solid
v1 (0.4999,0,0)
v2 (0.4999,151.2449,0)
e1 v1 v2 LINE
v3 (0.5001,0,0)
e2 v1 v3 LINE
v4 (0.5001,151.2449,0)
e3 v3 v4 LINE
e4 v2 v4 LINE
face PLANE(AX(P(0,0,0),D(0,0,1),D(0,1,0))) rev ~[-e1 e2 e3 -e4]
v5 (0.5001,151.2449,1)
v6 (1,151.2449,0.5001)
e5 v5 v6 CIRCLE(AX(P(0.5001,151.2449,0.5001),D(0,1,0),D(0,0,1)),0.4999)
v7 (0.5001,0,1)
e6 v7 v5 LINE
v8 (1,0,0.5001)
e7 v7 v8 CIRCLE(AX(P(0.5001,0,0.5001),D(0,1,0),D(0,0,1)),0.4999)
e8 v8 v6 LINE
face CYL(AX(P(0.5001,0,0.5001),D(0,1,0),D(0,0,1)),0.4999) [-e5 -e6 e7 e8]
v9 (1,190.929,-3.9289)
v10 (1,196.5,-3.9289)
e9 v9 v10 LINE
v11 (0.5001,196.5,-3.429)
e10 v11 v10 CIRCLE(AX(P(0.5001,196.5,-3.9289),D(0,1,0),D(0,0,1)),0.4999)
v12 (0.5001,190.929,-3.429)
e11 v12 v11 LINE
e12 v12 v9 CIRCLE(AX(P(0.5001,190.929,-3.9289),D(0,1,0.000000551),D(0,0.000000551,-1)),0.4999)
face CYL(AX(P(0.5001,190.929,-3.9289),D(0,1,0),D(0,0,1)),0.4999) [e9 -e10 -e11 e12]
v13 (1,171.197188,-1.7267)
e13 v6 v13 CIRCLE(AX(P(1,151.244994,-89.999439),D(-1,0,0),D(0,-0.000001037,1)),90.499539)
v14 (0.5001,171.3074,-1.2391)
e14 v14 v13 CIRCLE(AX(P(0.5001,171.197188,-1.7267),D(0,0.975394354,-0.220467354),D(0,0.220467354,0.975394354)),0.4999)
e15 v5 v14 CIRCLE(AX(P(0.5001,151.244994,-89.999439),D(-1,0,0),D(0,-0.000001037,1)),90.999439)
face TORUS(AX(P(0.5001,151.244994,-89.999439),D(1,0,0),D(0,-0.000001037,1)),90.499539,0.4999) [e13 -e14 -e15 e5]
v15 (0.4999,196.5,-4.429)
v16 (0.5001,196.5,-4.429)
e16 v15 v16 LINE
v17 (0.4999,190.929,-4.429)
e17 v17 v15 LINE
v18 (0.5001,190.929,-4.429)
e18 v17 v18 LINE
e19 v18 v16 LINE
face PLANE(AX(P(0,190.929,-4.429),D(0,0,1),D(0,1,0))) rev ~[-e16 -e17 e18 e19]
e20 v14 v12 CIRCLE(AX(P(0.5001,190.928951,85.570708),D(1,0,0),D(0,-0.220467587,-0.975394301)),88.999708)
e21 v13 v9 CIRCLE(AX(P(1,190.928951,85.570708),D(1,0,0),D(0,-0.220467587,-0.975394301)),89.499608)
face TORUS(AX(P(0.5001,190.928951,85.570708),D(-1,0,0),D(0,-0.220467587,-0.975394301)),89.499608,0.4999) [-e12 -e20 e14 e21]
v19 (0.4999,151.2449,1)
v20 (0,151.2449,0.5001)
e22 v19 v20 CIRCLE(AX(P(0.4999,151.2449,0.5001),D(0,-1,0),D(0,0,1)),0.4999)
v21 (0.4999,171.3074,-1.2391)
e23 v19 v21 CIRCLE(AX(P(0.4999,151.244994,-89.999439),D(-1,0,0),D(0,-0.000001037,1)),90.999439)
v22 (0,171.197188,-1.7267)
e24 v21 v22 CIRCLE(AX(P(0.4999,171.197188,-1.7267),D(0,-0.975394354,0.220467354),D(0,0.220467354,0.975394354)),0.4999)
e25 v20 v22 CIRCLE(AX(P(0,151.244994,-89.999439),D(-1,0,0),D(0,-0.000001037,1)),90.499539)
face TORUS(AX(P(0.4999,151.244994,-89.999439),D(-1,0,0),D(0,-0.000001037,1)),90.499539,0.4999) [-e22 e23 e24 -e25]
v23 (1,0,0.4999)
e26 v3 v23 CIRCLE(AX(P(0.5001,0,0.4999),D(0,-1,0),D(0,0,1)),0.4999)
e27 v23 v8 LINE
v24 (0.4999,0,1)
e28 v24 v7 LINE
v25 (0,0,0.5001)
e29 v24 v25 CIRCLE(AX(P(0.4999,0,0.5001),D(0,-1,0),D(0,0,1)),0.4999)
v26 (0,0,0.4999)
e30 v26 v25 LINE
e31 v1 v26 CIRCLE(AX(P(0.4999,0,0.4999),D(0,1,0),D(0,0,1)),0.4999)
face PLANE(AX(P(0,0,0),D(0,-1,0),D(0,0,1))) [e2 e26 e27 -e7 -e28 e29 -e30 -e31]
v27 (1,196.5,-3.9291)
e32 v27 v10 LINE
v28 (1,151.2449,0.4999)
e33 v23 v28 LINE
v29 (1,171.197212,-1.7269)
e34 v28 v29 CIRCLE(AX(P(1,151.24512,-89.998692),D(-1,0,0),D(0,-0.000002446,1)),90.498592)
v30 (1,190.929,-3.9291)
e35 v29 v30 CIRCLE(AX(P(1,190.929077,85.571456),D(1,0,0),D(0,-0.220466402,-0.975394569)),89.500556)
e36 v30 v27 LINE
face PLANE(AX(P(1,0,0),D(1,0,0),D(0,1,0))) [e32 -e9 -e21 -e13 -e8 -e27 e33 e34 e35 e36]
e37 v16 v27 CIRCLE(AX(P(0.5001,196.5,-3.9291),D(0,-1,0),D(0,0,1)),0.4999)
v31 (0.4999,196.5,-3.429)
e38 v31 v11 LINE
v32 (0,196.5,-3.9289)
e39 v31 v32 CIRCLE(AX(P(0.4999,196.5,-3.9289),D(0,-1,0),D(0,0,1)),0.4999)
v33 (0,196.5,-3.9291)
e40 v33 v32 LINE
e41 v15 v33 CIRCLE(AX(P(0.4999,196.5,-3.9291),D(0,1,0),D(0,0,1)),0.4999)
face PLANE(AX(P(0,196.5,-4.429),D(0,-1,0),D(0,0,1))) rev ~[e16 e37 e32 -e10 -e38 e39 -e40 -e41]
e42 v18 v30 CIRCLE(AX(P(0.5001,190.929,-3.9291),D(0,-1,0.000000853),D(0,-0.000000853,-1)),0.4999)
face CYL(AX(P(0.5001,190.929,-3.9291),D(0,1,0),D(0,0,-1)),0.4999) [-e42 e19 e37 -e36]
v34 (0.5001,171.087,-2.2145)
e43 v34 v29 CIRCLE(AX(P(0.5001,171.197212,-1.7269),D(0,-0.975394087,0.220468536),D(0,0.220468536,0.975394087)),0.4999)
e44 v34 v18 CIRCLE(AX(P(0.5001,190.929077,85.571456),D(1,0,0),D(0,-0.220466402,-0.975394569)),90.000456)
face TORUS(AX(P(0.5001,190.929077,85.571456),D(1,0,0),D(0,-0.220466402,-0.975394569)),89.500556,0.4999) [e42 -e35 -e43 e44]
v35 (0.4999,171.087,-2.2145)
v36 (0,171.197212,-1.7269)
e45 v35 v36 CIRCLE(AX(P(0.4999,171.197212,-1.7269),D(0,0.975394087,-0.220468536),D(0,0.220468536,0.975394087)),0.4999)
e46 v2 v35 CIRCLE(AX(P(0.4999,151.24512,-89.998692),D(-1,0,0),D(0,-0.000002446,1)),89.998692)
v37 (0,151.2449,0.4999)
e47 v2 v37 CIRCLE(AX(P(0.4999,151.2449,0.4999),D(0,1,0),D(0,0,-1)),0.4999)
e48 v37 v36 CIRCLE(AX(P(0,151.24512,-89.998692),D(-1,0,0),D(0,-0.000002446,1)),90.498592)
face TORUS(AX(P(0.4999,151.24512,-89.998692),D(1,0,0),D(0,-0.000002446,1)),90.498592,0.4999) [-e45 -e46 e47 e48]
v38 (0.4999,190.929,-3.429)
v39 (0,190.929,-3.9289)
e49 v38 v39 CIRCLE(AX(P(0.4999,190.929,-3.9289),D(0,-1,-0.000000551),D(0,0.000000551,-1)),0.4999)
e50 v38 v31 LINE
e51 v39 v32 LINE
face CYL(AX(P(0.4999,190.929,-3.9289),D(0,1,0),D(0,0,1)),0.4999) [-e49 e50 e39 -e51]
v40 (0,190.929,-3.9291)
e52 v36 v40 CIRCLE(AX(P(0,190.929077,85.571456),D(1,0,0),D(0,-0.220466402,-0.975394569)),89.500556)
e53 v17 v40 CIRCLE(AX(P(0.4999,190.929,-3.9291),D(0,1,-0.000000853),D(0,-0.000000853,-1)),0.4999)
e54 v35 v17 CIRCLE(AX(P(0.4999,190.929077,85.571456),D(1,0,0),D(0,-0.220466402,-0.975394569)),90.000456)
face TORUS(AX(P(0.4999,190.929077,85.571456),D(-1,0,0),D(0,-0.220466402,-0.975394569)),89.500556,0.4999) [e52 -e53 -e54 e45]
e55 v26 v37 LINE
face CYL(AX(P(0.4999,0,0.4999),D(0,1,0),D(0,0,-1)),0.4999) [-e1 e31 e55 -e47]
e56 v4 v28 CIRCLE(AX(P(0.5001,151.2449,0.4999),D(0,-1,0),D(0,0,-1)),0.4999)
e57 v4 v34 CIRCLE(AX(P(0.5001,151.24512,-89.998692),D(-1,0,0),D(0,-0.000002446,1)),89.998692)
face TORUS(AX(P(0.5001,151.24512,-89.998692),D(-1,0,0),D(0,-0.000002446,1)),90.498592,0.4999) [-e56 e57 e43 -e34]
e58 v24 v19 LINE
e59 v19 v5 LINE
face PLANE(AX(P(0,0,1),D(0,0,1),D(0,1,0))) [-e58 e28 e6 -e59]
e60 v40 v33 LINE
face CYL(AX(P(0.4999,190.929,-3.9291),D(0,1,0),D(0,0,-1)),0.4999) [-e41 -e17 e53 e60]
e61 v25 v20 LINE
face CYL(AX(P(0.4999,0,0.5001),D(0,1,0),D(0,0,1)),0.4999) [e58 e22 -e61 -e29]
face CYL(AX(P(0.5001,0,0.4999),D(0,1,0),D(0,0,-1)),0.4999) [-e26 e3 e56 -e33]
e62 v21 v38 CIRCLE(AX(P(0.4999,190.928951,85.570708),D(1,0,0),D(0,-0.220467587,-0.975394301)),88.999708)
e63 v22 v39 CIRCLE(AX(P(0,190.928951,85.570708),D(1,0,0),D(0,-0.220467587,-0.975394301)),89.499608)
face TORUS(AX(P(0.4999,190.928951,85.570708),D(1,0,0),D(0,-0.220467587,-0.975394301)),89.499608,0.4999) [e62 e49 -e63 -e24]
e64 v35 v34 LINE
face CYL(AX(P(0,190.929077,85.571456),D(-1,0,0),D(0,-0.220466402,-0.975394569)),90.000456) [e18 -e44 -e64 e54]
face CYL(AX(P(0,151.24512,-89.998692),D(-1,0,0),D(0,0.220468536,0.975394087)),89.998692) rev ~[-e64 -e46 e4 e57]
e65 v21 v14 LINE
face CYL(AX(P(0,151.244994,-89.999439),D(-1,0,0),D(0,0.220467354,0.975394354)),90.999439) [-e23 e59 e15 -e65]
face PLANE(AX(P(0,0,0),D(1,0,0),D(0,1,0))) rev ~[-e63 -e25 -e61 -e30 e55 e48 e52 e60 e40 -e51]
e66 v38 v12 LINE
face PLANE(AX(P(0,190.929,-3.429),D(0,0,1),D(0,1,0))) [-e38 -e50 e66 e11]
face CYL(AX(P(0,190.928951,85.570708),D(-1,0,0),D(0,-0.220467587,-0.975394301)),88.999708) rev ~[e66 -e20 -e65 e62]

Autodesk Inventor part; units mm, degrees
ref_plane "YZ Plane" through (0, 0, 0) normal (1, 0, 0) x (0, 1, 0)
ref_plane "XZ Plane" through (0, 0, 0) normal (0, 1, 0) x (-1, 0, 0)
ref_plane "XY Plane" through (0, 0, 0) normal (0, 0, 1) x (1, 0, 0)
sketch "Sketch3" plane through (0, 0, 0) normal (1, 0, 0) x (0, 1, 0)
  line L0 (0, 0) -> (151.2449, 0)
  arc A0 (171.087, -2.2145) -> (151.2449, 0) centre (151.2449, -90) ccw
  arc A1 (171.087, -2.2145) -> (190.929, -4.429) centre (190.929, 85.571) ccw
  line L1 (190.929, -4.429) -> (196.5, -4.429)
  line L2 (0, 1) -> (151.2449, 1)
  arc A2 (171.3074, -1.2391) -> (151.2449, 1) centre (151.2449, -90) ccw
  arc A3 (171.3074, -1.2391) -> (190.929, -3.429) centre (190.929, 85.571) ccw
  line L3 (190.929, -3.429) -> (196.5, -3.429)
  line L4 (196.5, -4.429) -> (196.5, -3.429)
  line L5 (0, 0) -> (0, 1)
  dimension "d42" = 90
  dimension "d43" = 90
  dimension "d44" = 4.429
  dimension "d45" = 5.571
  dimension "d46" = 1
  dimension "d50" = 196.5
extrude "fiberBase" add sketch "Sketch3" along normal blind 1
fillet "round" radius 0.5 16 edges at (1, 181.0573, -2.8798) (1, 161.3385, 0.4385) (1, 75.6225, 1) (1, 193.7145, -3.429) (0, 181.0573, -2.8798) (0, 161.3385, 0.4385) (0, 75.6225, 1) (0, 193.7145, -3.429) (0, 180.9464, -3.8737) (0, 161.2276, -0.5553) (0, 75.6225, 0) (0, 193.7145, -4.429) (1, 180.9464, -3.8737) (1, 161.2276, -0.5553) (1, 75.6225, 0) (1, 193.7145, -4.429)
equation "\"d42\" = curvatureRadius"
equation "\"d43\" = curvatureRadius"
equation "\"d44\" = deepTrackDepth - shallowTrackDepth"
equation "\"d45\" = deepTrackDepth"
equation "\"d46\" = opticalFiberDiameter"
equation "\"d50\" = -scintillatorEdgeClearence + scintillatorHeight - 0.5 * opticalFiberDiameter"
equation "\"d47\" = opticalFiberDiameter"
equation "\"d49\" = 0.5 * opticalFiberDiameter"
equation "\"OpticalFiberDiameter\" = 1"
equation "\"OpticalFiberClearence\" = 0.071"
equation "\"ScintillatorEdgeClearence\" = 3"
equation "\"MPPCDepth\" = 1"
equation "\"LoopLargeTrackRatio\" = 1.1"
equation "\"d24\" = 0.05"
equation "\"d25\" = 1"
equation "\"d32\" = 0.05"
equation "\"d33\" = 1"
equation "\"FiberSensorClerence\" = 0.5"
equation "\"SmallTrackDiameter\" = 175"
equation "\"ShallowTrackDepth\" = 1.142"
equation "\"MPPCClearence\" = 0.075"
equation "\"MPPCSensorClearence\" = 1.45"
equation "\"MPPCSensorOffsett\" = 2.105"
equation "\"MPPCWidth\" = 5.9"
equation "\"MPPCHeight\" = 6.55"
equation "\"FiberEdgeOffsett\" = 5"
equation "\"LongFiberAngle\" = 30deg"
equation "\"ShortFiberAngle\" = 78deg"
equation "\"MountingScrewOffsett\" = 9"
equation "\"MountingScrewDepth\" = 4"
equation "\"DeepTrackDepth\" = 5.571"
equation "\"FoilThickness\" = 0.2"
equation "\"silveringThickness\" = 0.2"
equation "\"mppcMountDepth\" = 6.35"
equation "\"curvatureRadius\" = 90"
equation "\"shallowTrackDepth\" = 1.142"
equation "\"deepTrackDepth\" = 5.571"
equation "\"fiberEdgeOffsett\" = 5"
equation "\"scintillatorEdgeClearence\" = 3"
equation "\"opticalFiberDiameter\" = 1"
equation "\"opticalFiberClearence\" = 0.071"
equation "\"scintillatorHeight\" = 200"
properties part number "Fiber Loop" material "Glass"
